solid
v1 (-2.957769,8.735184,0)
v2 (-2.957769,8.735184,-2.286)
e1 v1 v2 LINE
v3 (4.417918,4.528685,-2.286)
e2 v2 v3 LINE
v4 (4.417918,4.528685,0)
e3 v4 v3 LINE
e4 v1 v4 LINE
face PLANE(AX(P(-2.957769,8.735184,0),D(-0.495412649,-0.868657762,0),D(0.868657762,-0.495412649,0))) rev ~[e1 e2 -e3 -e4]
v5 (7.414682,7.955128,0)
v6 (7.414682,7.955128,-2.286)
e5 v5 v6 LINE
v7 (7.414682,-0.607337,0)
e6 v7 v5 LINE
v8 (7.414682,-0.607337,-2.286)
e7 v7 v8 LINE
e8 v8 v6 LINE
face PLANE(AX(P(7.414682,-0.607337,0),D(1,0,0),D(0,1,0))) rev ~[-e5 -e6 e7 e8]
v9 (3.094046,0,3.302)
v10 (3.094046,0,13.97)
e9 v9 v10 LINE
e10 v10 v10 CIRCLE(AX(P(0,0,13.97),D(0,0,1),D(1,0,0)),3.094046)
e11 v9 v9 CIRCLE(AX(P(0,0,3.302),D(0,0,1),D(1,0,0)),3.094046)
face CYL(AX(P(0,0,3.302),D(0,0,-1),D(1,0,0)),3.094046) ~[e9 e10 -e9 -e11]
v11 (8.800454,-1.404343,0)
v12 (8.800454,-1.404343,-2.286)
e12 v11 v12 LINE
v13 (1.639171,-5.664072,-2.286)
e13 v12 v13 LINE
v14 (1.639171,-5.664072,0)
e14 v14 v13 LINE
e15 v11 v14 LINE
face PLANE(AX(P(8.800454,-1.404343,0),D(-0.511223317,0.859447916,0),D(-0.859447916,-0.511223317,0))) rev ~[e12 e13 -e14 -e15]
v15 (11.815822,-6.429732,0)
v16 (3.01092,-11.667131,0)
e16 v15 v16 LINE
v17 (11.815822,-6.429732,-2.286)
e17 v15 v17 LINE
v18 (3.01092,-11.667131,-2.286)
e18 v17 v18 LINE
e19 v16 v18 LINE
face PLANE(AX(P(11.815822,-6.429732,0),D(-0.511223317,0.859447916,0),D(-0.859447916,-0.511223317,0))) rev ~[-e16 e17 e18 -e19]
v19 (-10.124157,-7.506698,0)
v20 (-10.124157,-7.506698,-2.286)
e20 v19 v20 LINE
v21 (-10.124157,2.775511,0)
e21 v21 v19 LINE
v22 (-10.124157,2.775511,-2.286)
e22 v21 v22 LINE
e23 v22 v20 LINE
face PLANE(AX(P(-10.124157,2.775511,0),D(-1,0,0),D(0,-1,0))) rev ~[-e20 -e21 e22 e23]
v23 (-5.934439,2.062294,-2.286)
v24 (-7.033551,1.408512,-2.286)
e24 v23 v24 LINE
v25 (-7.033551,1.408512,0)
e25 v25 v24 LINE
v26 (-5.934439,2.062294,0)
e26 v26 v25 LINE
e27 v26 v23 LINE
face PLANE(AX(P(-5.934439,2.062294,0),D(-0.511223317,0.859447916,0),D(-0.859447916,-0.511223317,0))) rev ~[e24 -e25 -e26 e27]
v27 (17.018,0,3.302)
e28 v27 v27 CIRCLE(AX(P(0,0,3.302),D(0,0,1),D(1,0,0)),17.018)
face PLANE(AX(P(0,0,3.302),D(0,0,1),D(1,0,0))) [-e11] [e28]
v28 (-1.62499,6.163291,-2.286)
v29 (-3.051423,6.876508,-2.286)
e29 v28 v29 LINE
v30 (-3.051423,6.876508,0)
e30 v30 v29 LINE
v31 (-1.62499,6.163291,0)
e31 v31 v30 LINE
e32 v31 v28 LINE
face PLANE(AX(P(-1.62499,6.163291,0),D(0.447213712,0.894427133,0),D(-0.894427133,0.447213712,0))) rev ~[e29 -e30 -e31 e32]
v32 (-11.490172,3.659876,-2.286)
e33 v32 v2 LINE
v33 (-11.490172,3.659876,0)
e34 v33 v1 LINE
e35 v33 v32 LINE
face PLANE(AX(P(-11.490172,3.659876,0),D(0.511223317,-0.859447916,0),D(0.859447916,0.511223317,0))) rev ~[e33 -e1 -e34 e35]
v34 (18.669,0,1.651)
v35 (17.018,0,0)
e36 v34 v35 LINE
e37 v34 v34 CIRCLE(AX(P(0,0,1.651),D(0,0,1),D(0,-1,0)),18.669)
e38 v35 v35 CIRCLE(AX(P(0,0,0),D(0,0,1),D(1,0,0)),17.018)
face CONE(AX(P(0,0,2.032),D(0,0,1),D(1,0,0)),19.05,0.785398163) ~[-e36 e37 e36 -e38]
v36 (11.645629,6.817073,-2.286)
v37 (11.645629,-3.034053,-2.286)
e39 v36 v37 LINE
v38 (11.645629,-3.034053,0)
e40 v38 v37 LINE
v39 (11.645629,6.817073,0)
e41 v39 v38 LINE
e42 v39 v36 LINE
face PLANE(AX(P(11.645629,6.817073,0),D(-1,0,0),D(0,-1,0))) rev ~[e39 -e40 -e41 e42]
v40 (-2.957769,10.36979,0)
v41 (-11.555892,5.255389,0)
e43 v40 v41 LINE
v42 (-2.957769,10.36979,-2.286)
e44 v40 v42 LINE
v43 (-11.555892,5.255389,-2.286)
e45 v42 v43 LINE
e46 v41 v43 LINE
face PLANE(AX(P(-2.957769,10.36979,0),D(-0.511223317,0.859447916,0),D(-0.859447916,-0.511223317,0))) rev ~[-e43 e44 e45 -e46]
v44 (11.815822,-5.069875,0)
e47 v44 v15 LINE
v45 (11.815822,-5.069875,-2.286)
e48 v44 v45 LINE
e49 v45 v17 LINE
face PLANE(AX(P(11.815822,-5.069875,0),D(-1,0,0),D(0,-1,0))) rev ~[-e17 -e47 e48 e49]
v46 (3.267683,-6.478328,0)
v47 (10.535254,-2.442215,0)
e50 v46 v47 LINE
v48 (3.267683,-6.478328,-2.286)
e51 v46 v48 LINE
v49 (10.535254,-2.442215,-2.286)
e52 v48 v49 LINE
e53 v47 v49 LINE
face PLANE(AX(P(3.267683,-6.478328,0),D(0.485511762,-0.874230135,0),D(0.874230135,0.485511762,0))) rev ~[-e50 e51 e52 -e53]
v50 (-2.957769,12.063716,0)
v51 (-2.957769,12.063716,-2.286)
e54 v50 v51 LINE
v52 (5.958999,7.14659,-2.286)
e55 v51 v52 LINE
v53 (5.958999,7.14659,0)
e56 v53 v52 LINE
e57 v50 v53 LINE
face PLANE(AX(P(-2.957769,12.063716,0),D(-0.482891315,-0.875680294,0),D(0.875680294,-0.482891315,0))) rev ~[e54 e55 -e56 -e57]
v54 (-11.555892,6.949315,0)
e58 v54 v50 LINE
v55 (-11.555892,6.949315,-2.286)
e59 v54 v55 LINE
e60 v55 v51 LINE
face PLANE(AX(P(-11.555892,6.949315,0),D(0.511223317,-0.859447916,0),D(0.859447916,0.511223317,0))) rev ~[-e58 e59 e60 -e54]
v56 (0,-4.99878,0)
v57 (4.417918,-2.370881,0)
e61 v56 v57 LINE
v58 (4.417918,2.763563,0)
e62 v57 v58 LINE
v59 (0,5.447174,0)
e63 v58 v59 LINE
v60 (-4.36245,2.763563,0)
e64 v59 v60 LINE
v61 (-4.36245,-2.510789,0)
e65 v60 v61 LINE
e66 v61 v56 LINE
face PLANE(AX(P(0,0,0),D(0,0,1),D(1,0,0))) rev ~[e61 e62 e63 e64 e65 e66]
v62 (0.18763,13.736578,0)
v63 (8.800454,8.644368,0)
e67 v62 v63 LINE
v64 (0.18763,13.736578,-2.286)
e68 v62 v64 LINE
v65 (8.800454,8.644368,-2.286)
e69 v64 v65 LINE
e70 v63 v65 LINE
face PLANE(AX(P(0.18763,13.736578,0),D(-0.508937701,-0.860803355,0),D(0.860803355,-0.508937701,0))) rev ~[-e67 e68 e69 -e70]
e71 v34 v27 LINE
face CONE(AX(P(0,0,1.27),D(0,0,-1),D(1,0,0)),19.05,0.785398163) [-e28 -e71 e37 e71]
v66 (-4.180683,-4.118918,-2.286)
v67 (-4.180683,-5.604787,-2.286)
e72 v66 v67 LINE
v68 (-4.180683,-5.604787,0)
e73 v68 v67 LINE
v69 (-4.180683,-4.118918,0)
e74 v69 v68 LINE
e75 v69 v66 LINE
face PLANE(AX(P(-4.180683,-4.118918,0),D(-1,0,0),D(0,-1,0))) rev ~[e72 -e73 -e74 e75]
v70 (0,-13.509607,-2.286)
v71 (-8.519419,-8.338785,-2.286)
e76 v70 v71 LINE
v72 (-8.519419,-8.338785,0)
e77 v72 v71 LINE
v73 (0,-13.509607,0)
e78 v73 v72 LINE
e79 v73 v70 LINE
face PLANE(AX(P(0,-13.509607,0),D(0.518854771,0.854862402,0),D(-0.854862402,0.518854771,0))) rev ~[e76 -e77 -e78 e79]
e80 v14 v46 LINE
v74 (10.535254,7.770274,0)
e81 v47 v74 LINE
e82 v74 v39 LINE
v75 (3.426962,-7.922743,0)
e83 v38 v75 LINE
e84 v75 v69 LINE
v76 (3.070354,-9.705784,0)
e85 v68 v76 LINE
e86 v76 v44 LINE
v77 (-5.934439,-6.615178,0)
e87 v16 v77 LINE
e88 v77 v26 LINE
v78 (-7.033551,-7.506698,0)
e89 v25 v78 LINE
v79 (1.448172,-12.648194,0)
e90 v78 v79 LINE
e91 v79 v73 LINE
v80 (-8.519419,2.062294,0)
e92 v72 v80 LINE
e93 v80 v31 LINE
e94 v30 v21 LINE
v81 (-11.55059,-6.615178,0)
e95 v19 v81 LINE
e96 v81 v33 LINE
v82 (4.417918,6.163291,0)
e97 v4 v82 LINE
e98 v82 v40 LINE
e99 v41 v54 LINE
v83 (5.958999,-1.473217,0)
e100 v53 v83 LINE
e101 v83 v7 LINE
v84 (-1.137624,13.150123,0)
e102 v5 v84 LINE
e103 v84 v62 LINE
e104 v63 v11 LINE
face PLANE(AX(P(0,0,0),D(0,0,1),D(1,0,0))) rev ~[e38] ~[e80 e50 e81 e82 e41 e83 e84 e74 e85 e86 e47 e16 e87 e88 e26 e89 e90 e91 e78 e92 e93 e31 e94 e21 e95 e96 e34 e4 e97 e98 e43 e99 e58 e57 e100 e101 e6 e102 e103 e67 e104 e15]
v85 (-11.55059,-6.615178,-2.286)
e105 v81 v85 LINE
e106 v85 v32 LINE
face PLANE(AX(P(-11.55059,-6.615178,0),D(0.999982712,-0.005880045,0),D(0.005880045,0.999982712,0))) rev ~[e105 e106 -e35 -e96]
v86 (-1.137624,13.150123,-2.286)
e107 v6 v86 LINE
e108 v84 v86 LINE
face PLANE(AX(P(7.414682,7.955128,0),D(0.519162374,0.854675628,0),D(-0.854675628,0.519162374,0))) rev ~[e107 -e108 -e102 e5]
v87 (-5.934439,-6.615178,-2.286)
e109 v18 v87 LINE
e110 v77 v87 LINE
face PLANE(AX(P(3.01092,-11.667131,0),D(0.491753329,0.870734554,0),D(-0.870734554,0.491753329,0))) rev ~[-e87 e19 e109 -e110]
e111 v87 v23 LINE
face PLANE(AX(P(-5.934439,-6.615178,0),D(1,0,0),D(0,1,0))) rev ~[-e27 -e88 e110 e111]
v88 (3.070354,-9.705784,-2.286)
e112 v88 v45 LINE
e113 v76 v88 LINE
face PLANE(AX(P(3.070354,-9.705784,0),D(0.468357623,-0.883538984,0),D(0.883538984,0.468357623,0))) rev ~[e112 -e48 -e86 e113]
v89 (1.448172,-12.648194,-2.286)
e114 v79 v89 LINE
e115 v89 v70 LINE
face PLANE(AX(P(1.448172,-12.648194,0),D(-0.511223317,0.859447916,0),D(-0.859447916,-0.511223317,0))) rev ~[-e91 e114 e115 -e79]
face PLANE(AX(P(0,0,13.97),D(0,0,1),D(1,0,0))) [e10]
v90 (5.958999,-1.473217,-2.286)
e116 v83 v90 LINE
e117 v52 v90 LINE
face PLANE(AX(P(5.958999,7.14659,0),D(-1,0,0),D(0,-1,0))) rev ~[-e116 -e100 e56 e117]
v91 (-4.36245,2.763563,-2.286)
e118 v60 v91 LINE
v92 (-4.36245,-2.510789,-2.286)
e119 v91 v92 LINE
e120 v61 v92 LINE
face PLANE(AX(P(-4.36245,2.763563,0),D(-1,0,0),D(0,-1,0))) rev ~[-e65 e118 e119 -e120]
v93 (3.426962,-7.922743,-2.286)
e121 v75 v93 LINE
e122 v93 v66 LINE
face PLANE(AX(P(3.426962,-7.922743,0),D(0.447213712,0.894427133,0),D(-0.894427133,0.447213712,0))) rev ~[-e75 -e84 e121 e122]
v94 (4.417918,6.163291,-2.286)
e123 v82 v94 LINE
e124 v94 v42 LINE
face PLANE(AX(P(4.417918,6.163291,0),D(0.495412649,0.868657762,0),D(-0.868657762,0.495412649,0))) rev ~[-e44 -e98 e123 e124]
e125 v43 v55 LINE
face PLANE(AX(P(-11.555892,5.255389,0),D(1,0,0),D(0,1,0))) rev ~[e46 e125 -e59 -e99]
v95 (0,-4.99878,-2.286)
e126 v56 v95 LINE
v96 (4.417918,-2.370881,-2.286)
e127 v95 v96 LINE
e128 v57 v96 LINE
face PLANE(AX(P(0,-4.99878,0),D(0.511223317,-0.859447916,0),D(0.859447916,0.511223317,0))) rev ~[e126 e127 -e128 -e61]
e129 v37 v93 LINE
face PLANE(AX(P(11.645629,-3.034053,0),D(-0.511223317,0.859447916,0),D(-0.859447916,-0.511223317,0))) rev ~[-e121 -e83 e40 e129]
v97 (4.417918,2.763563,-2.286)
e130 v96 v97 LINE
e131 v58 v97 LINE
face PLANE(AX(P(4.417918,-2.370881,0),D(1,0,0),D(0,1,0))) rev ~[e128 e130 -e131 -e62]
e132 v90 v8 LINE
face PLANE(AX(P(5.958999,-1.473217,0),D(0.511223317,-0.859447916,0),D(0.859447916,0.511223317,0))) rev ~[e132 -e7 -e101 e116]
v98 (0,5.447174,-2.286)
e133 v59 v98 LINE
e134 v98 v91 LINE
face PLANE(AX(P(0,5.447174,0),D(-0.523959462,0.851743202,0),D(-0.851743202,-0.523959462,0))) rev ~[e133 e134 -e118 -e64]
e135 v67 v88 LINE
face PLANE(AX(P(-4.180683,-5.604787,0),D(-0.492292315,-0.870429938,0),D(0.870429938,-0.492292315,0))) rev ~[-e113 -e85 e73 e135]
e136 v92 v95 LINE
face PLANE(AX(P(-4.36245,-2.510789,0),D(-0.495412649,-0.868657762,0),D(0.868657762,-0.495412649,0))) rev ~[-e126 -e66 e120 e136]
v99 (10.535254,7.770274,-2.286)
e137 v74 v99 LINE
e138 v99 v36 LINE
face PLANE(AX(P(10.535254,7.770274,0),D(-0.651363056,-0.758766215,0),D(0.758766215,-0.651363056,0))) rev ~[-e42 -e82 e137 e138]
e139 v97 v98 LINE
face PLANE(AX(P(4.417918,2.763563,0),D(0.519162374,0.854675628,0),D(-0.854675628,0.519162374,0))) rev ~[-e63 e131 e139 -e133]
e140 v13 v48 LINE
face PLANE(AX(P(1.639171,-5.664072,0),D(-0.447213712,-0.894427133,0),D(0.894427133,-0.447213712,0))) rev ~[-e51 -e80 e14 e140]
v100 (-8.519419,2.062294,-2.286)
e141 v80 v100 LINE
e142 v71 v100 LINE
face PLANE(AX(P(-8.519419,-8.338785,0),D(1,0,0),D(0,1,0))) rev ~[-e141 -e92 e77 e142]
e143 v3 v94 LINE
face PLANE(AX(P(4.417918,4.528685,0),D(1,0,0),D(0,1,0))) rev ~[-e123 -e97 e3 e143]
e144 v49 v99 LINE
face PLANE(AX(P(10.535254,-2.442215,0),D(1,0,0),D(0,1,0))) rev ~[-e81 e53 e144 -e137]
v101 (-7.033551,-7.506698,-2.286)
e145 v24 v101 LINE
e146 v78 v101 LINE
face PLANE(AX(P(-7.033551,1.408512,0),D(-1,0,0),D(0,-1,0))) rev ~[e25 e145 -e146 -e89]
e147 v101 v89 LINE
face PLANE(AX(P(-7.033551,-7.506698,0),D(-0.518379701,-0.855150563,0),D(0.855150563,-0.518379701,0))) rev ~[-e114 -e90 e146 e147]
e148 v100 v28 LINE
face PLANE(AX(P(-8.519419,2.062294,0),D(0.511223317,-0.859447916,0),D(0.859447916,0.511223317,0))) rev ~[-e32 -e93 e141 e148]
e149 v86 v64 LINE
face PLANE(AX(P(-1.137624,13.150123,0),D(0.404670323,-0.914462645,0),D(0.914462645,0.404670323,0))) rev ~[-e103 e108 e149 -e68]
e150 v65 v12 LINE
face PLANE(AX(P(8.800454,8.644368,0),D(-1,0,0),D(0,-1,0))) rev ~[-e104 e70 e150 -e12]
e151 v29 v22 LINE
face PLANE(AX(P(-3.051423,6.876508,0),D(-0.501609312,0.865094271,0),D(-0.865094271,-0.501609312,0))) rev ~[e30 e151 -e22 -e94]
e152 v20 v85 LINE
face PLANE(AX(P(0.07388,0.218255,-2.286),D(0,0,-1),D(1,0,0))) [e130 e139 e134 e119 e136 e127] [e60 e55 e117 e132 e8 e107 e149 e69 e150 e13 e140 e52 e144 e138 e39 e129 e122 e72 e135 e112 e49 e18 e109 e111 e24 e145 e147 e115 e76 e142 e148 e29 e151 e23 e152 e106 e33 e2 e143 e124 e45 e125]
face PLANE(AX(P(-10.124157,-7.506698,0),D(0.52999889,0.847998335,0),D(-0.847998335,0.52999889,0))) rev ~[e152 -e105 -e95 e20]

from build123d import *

# Parameters (mm, degrees)
F0_R     = 19.05
F1_DEPTH = 3.302
F2_R     = 3.0940455734
F3_DEPTH = 10.668
F4_SIZE  = 2.032
F7_DEPTH = 2.286


# Not quite as in the source:
# - a fillet or chamfer that OpenCascade refuses, or shapes differently, is made with other operations: its cross-section is extruded or revolved along the edge and cut away or added


with BuildPart() as f1:
    # F0 (on Top) → F1 (new body)
    with BuildSketch(Plane.XY):
        Circle(F0_R)
    extrude(amount=F1_DEPTH)

    # F2 (on face) → F3 (join)
    with BuildSketch(Plane.XY.offset(3.302)):
        Circle(F2_R)
    extrude(amount=F3_DEPTH)

    # F4
    f4_edges = [f1.edges().sort_by_distance(p)[0] for p in [
        (-19.05, 0, 3.302),
    ]]
    chamfer(f4_edges, length=F4_SIZE)

    # F5: chamfer of 2.032 on 1 edges, made by hand

    # F5_s1 → F5_t2 (revolve, cut)
    with BuildSketch(Plane.XZ):
        Polygon((19.05, 2.032), (17.018, 0), (19.05, 0), align=None)
    revolve(axis=Axis((0, 0, 0), (0, 0, 1)), mode=Mode.SUBTRACT)

    # F6 (on face) → F7 (join)
    with BuildSketch(Plane(origin=(0, 0, 0), x_dir=(1, 0, 0), z_dir=(0, 0, -1))):
        Polygon((-10.1241571829, 7.50669837), (-11.5505903959, 6.6151777282), (-11.4901715756, -3.6598756731), (-2.9577685054, -8.7351842692), (4.4179176912, -4.5286850072), (4.4179176912, -6.1632911675), (-2.9577685054, -10.3697904294), (-11.5558920335, -5.255389493), (-11.5558920335, -6.9493146705), (-2.9577685054, -12.0637156069), (5.9589991364, -7.1465903893), (5.9589991364, 1.4732169604), (7.414681837, 0.6073367549), (7.414681837, -7.955128327), (-1.1376237962, -13.150122948), (0.1876302122, -13.7365777045), (8.8004540583, -8.6443684995), (8.8004540583, 1.404343208), (1.6391712, 5.6640716984), (3.2676828559, 6.4783277921), (10.5352541432, 2.4422151037), (10.5352541432, -7.7702743001), (11.6456285548, -6.8170730956), (11.6456285548, 3.0340532394), (3.4269623458, 7.9227425003), (-4.1806832887, 4.1189184412), (-4.1806832887, 5.604787264), (3.0703544617, 9.7057837993), (11.8158220797, 5.0698746927), (11.8158220797, 6.4297318659), (3.0109197833, 11.667130515), (-5.9344387757, 6.6151777282), (-5.9344387757, -2.0622941665), (-7.0335506462, -1.408512122), (-7.0335506462, 7.50669837), (1.4481722892, 12.6481941369), (0, 13.5096069425), (-8.5194194689, 8.338784799), (-8.5194194689, -2.0622941665), (-1.6249895561, -6.1632911675), (-3.0514232349, -6.8765082397), (-10.1241571829, -2.7755110059), align=None)
        Polygon((0, -5.4471737376), (-4.3624499813, -2.7635633014), (-4.3624499813, 2.5107886177), (0, 4.998779855), (4.4179176912, 2.3708806043), (4.4179176912, -2.7635630686), align=None, mode=Mode.SUBTRACT)
    extrude(amount=F7_DEPTH)


solid = f1.part
